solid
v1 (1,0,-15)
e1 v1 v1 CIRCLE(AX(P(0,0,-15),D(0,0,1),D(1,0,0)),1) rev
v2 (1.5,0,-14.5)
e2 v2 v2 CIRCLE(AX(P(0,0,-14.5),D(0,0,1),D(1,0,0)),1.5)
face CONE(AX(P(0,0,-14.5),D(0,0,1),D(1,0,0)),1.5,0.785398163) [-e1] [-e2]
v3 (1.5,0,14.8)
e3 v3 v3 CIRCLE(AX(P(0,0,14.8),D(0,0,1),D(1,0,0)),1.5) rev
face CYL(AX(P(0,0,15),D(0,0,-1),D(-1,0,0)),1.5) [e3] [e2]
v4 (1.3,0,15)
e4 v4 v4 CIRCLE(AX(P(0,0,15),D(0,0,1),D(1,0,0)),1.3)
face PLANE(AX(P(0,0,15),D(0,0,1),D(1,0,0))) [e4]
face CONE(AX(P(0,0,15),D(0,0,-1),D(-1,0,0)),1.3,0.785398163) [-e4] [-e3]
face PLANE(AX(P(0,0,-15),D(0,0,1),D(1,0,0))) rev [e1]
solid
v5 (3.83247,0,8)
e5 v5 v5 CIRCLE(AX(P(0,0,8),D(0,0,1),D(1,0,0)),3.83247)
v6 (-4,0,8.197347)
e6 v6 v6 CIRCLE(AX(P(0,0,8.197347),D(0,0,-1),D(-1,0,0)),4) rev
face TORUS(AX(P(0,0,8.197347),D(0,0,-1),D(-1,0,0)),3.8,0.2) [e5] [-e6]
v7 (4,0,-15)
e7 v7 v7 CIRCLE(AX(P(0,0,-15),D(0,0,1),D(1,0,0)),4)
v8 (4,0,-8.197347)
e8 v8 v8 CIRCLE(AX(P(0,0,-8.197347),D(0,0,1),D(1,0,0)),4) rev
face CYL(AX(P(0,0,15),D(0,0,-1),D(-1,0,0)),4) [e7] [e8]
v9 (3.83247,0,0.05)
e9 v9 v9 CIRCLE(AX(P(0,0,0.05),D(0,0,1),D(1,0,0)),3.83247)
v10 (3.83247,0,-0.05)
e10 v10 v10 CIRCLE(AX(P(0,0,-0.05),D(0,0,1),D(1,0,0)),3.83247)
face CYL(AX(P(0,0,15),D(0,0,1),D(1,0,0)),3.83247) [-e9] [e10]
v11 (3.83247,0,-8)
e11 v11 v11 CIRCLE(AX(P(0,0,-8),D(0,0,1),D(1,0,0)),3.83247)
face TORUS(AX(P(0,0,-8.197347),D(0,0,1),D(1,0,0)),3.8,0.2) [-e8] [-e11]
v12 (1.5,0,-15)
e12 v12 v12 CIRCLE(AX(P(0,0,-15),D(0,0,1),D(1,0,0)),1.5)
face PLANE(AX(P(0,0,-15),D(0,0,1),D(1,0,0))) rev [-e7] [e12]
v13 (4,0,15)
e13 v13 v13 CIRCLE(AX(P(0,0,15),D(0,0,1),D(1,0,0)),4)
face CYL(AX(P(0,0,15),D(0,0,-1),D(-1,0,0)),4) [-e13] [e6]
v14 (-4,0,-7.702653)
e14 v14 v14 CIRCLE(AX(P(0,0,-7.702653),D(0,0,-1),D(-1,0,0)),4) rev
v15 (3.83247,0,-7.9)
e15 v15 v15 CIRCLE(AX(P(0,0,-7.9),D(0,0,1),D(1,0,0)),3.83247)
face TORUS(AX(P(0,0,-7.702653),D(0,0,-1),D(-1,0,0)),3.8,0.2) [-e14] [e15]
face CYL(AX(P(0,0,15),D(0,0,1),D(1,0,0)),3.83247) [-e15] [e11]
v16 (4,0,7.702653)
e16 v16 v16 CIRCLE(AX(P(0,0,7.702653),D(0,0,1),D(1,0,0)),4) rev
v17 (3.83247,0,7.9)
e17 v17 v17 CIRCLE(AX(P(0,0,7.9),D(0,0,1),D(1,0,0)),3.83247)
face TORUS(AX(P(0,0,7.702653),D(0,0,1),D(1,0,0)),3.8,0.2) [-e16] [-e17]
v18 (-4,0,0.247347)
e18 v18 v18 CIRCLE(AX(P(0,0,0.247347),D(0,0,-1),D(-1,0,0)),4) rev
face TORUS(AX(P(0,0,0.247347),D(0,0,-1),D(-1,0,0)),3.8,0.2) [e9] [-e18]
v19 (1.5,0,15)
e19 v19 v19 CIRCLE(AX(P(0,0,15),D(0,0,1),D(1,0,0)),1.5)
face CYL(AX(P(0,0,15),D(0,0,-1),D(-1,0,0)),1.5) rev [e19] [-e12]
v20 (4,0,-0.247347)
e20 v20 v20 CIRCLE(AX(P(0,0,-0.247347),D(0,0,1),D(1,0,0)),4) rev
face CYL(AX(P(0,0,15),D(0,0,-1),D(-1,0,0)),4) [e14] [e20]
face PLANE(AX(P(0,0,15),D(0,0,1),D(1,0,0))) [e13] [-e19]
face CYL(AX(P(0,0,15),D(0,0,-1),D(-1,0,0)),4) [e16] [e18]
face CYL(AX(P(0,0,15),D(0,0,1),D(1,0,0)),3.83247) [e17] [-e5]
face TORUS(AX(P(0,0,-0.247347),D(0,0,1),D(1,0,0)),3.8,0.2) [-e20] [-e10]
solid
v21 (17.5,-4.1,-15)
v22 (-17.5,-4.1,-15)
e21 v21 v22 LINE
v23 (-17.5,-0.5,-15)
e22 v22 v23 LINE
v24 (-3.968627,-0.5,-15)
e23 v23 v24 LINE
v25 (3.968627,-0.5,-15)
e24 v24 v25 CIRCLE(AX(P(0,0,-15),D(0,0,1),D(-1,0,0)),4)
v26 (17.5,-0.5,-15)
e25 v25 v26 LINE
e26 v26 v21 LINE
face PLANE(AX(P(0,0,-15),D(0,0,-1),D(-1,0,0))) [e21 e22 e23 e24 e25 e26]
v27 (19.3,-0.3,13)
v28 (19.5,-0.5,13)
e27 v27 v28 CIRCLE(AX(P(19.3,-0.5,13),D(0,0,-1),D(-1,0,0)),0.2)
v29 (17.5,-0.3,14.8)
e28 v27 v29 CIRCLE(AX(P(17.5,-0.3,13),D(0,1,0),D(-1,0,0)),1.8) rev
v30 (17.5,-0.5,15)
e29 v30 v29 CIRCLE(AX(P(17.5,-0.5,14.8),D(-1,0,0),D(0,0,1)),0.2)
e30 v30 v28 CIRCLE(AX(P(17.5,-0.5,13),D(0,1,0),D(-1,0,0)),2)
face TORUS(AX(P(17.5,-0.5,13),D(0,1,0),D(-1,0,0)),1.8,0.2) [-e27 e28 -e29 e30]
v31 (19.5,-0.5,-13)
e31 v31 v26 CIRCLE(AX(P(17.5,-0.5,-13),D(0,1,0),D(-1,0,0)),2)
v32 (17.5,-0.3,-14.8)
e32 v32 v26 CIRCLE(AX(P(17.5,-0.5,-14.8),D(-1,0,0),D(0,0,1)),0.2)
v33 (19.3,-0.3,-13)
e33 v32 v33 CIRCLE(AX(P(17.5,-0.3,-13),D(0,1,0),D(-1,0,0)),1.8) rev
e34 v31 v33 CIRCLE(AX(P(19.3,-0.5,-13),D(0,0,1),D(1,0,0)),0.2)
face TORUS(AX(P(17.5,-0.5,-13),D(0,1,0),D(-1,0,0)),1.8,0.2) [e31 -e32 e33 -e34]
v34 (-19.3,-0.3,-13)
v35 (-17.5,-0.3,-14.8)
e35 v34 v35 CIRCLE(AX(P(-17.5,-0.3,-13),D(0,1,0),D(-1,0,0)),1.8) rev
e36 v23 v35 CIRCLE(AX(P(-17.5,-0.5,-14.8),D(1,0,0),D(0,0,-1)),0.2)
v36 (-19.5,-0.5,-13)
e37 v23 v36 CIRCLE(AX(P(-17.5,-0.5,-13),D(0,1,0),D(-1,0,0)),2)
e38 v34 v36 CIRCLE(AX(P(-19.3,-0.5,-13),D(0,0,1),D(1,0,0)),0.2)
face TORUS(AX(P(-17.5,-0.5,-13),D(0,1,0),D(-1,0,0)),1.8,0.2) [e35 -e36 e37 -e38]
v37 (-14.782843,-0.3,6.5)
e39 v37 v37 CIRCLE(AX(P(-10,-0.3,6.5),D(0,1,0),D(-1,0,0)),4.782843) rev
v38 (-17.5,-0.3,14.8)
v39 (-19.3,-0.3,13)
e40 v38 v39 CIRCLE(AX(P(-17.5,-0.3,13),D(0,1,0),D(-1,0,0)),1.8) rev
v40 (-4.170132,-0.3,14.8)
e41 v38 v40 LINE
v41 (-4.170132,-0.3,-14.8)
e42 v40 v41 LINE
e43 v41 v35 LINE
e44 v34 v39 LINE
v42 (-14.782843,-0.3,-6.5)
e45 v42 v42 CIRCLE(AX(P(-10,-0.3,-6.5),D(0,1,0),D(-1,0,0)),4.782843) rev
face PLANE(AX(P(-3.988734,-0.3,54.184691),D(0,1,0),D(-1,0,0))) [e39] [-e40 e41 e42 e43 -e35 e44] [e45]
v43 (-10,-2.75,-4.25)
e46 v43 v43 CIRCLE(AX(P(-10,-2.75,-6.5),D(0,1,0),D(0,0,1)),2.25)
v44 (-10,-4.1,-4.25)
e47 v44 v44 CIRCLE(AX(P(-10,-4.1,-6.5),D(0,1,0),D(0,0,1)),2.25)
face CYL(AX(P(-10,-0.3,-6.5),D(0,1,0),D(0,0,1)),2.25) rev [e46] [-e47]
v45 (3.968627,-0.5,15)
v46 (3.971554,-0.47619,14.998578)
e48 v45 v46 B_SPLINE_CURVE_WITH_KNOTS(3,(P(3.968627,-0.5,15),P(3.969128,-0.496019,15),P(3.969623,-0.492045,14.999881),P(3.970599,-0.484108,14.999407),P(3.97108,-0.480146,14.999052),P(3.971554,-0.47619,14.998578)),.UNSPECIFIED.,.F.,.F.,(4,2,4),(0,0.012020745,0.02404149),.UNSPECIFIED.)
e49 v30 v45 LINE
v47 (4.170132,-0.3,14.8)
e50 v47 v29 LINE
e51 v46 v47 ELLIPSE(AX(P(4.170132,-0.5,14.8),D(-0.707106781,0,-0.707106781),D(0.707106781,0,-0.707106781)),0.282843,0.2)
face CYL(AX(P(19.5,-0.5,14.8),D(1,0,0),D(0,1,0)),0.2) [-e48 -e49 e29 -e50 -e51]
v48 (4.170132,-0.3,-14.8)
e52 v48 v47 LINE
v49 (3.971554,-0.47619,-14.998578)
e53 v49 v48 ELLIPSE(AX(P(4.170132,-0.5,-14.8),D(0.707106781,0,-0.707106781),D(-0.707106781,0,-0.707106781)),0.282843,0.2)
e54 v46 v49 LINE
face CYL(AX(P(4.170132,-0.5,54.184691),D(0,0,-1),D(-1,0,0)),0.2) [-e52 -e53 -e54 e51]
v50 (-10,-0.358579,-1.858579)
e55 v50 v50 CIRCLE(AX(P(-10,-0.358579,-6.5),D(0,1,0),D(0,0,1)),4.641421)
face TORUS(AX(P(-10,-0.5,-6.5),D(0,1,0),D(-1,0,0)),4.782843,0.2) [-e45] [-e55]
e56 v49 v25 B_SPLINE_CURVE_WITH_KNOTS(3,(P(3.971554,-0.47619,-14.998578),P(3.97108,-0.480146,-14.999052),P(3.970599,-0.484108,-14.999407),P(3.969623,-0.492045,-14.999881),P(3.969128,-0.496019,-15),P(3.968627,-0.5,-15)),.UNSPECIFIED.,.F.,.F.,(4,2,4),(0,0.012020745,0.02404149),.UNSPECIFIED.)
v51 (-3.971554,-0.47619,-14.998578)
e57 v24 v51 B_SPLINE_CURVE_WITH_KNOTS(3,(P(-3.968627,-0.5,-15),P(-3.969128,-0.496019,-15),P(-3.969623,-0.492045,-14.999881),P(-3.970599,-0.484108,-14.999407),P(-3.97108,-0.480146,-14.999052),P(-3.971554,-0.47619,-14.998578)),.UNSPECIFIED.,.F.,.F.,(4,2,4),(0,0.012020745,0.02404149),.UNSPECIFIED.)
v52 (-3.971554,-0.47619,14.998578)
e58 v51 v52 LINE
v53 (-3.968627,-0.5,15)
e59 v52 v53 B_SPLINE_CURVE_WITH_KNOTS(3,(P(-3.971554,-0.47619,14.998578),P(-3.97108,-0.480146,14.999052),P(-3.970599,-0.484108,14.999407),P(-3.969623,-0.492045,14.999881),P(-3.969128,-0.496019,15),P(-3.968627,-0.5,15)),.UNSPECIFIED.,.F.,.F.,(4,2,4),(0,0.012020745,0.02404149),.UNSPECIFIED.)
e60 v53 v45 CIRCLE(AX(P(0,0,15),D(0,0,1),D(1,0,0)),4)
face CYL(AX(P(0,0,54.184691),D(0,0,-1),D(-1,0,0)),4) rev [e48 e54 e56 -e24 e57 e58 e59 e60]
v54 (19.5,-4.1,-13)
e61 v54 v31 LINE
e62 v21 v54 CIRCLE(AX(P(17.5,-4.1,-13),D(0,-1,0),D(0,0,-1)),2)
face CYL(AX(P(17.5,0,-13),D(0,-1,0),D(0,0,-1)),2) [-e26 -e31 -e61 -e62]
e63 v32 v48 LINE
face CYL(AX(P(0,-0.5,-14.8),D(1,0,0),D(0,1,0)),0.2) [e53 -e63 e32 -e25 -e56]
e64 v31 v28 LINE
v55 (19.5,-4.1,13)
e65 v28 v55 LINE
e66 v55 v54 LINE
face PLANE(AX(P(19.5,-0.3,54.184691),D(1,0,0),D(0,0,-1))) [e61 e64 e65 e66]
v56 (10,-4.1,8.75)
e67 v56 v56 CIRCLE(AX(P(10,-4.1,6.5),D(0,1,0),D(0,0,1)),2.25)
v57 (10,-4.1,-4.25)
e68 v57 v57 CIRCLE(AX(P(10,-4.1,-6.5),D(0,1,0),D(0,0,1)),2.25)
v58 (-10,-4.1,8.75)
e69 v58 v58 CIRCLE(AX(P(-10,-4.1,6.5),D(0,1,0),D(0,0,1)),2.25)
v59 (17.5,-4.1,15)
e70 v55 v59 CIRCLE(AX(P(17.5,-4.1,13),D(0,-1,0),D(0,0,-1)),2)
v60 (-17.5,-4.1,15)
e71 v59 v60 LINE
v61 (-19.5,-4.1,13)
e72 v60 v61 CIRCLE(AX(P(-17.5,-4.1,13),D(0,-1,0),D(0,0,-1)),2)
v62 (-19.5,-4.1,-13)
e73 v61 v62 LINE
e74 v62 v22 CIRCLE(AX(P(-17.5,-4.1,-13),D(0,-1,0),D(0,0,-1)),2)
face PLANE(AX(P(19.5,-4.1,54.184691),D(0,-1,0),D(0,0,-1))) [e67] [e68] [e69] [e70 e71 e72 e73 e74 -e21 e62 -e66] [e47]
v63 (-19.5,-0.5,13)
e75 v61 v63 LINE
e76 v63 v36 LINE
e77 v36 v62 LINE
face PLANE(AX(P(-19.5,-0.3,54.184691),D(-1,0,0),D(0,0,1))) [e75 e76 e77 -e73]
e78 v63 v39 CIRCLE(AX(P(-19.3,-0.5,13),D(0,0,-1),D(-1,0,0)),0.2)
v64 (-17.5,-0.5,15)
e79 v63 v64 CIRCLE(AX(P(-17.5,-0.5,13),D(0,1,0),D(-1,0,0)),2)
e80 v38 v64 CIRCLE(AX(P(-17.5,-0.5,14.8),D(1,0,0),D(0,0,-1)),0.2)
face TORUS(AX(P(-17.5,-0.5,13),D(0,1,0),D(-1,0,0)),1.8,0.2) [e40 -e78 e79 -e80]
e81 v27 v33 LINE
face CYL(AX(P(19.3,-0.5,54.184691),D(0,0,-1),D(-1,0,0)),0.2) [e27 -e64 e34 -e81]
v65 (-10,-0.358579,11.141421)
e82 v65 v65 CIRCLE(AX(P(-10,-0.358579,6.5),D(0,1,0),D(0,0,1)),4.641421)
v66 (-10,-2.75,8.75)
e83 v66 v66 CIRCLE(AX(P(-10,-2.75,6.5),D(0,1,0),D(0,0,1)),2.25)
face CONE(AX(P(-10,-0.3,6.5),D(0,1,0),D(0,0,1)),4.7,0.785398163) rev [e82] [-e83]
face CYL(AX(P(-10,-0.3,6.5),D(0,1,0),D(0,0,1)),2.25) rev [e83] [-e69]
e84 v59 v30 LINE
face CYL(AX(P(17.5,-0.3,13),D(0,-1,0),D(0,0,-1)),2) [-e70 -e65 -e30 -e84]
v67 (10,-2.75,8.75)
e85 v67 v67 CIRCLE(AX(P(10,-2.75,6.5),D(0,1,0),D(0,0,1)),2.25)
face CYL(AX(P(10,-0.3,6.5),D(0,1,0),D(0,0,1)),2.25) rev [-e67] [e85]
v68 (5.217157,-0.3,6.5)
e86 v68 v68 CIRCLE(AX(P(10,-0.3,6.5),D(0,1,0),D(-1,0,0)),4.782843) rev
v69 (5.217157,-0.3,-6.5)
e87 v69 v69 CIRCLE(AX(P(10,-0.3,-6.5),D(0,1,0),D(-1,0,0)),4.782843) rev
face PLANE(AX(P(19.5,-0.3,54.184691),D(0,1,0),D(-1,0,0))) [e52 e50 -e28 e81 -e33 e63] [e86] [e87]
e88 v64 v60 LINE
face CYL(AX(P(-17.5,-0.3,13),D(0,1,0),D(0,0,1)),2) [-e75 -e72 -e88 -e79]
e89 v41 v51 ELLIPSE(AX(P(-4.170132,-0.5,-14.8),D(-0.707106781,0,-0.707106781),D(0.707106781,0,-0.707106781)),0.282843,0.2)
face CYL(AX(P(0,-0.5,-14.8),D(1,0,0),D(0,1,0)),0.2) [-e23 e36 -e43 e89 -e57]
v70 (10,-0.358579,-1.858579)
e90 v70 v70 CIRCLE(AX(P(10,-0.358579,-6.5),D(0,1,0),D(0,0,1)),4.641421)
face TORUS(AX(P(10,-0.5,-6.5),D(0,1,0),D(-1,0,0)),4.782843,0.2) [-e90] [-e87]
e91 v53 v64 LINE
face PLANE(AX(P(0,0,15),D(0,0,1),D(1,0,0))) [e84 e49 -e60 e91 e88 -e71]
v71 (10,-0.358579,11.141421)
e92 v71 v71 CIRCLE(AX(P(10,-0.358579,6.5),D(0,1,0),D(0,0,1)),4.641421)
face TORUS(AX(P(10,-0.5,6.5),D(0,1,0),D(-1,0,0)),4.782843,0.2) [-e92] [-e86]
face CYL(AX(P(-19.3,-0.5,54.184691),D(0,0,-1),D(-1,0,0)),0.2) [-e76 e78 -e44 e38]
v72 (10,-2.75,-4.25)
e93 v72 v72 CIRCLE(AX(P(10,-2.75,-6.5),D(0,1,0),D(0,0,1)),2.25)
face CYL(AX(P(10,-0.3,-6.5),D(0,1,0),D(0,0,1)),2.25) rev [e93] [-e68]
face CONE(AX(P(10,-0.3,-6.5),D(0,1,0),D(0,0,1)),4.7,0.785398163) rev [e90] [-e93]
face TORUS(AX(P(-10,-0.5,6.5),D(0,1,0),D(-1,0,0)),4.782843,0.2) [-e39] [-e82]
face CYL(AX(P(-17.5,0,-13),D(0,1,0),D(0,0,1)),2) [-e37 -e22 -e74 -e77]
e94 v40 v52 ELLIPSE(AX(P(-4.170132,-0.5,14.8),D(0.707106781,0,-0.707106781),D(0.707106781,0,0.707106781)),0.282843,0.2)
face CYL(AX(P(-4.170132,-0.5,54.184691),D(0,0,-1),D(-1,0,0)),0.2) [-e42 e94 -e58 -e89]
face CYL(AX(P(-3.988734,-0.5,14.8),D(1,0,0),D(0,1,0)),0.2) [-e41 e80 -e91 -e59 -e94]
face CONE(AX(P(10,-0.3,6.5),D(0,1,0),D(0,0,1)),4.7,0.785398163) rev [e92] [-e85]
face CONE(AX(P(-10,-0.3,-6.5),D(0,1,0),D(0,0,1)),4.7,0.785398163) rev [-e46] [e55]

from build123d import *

# Parameters (mm, degrees)
SKETCH_1_R                  = 4
SKETCH_1_R_2                = 1.5
EXTRUDE_1_DEPTH             = 15
SKETCH_2_R                  = 1.5
EXTRUDE_2_DEPTH             = 15
CHAMFER_1_SIZE              = 0.2
SKETCH_3_W                  = 1.062209714
SKETCH_3_H                  = 0.1
FILLET_1_R                  = 0.2
EXTRUDE_6_DEPTH             = 30
HOLE_WIZARD_M4_1_AT_2_COUNT = 2
HOLE_WIZARD_M4_1_AT_2_PITCH = 20
HOLE_WIZARD_M4_1_AT_3_COUNT = 2
HOLE_WIZARD_M4_1_AT_3_PITCH = 13
HOLE_WIZARD_M4_1_AT_4_COUNT = 2
HOLE_WIZARD_M4_1_AT_4_PITCH = 23.853720884
FILLET_2_R                  = 0.2
FILLET_3_R                  = 2
CHAMFER_2_SIZE              = 0.5


with BuildPart() as part:
    # 草图1 → 凸台-拉伸1 (new, symmetric)
    with BuildSketch(Plane.XY):
        Circle(SKETCH_1_R)
        Circle(SKETCH_1_R_2, mode=Mode.SUBTRACT)
    extrude(amount=EXTRUDE_1_DEPTH, both=True)

    # 草图3 → 切除-旋转1 (revolve, cut)
    with BuildSketch(Plane(origin=(0, 0, 0), x_dir=(1, 0, 0), z_dir=(0, 1, 0))):
        with Locations((4.363574537, 7.95)):
            Rectangle(SKETCH_3_W, SKETCH_3_H)
        with Locations((4.363574537, 0)):
            Rectangle(SKETCH_3_W, SKETCH_3_H)
        with Locations((4.363574537, -7.95)):
            Rectangle(SKETCH_3_W, SKETCH_3_H)
    revolve(axis=Axis((0, 0, 15), (0, 0, -1)), mode=Mode.SUBTRACT)

    # 圆角1
    # the kernel refuses this fillet: 0.2 mm, written as the material it takes off along each edge
    with BuildSketch(Plane(origin=(0, 0, -7.9), x_dir=(1, 0, 0), z_dir=(0, -1, 0))) as fillet_1_piece_1:
        with BuildLine():
            CenterArc((3.8, 0.1973467), FILLET_1_R, 279.343232253, 80.656767747)
            Line((4, 0.1973467), (4.004, 0.1973467))
            Line((4.004, 0.1973467), (4.004, 0))
            Line((4.004, 0), (4, -0.004))
            ThreePointArc((4, -0.004), (3.91623484, -0.004), (3.833119074, -0.003946934))
            Line((3.833119074, -0.003946934), (3.83246968, 0))
        make_face()
    revolve(axis=Axis((0, 0, -7.9), (0, 0, 1)), mode=Mode.SUBTRACT)
    with BuildSketch(Plane(origin=(0, 0, -8), x_dir=(1, 0, 0), z_dir=(0, -1, 0))) as fillet_1_piece_2:
        with BuildLine():
            CenterArc((3.8, -0.1973467), FILLET_1_R, 0, 80.656767747)
            Line((3.83246968, 0), (3.833119074, 0.003946934))
            ThreePointArc((3.833119074, 0.003946934), (3.91623484, 0.004), (4, 0.004))
            Line((4, 0.004), (4.004, 0))
            Line((4.004, 0), (4.004, -0.1973467))
            Line((4.004, -0.1973467), (4, -0.1973467))
        make_face()
    revolve(axis=Axis((0, 0, -8), (0, 0, 1)), mode=Mode.SUBTRACT)
    with BuildSketch(Plane(origin=(0, 0, 0.05), x_dir=(1, 0, 0), z_dir=(0, -1, 0))) as fillet_1_piece_3:
        with BuildLine():
            CenterArc((3.8, 0.1973467), FILLET_1_R, 279.343232253, 80.656767747)
            Line((4, 0.1973467), (4.004, 0.1973467))
            Line((4.004, 0.1973467), (4.004, 0))
            Line((4.004, 0), (4, -0.004))
            ThreePointArc((4, -0.004), (3.91623484, -0.004), (3.833119074, -0.003946934))
            Line((3.833119074, -0.003946934), (3.83246968, 0))
        make_face()
    revolve(axis=Axis((0, 0, 0.05), (0, 0, 1)), mode=Mode.SUBTRACT)
    with BuildSketch(Plane(origin=(0, 0, -0.05), x_dir=(1, 0, 0), z_dir=(0, -1, 0))) as fillet_1_piece_4:
        with BuildLine():
            CenterArc((3.8, -0.1973467), FILLET_1_R, 0, 80.656767747)
            Line((3.83246968, 0), (3.833119074, 0.003946934))
            ThreePointArc((3.833119074, 0.003946934), (3.91623484, 0.004), (4, 0.004))
            Line((4, 0.004), (4.004, 0))
            Line((4.004, 0), (4.004, -0.1973467))
            Line((4.004, -0.1973467), (4, -0.1973467))
        make_face()
    revolve(axis=Axis((0, 0, -0.05), (0, 0, 1)), mode=Mode.SUBTRACT)
    with BuildSketch(Plane(origin=(0, 0, 8), x_dir=(1, 0, 0), z_dir=(0, -1, 0))) as fillet_1_piece_5:
        with BuildLine():
            CenterArc((3.8, 0.1973467), FILLET_1_R, 279.343232253, 80.656767747)
            Line((3.83246968, 0), (3.833119074, -0.003946934))
            ThreePointArc((3.833119074, -0.003946934), (3.91623484, -0.004), (4, -0.004))
            Line((4, -0.004), (4.004, 0))
            Line((4.004, 0), (4.004, 0.1973467))
            Line((4.004, 0.1973467), (4, 0.1973467))
        make_face()
    revolve(axis=Axis((0, 0, 8), (0, 0, 1)), mode=Mode.SUBTRACT)
    with BuildSketch(Plane(origin=(0, 0, 7.9), x_dir=(1, 0, 0), z_dir=(0, -1, 0))) as fillet_1_piece_6:
        with BuildLine():
            CenterArc((3.8, -0.1973467), FILLET_1_R, 0, 80.656767747)
            Line((4, -0.1973467), (4.004, -0.1973467))
            Line((4.004, -0.1973467), (4.004, 0))
            Line((4.004, 0), (4, 0.004))
            ThreePointArc((4, 0.004), (3.91623484, 0.004), (3.833119074, 0.003946934))
            Line((3.833119074, 0.003946934), (3.83246968, 0))
        make_face()
    revolve(axis=Axis((0, 0, 7.9), (0, 0, 1)), mode=Mode.SUBTRACT)


with BuildPart() as body_2:
    # 草图2 → 凸台-拉伸2 (new, symmetric)
    with BuildSketch(Plane.XY):
        Circle(SKETCH_2_R)
    extrude(amount=EXTRUDE_2_DEPTH, both=True)

    # 倒角1
    chamfer_1_edges = [body_2.edges().sort_by_distance(p)[0] for p in [
        (-1.5, 0, 15),
    ]]
    chamfer(chamfer_1_edges, length=CHAMFER_1_SIZE)

    # 倒角2
    chamfer_2_edges = [body_2.edges().sort_by_distance(p)[0] for p in [
        (-1.5, 0, -15),
    ]]
    chamfer(chamfer_2_edges, length=CHAMFER_2_SIZE)


with BuildPart() as body_3:
    # 草图5 → 凸台-拉伸6 (new body)
    with BuildSketch(Plane(origin=(0, 0, -15), x_dir=(-1, 0, 0), z_dir=(0, 0, -1))):
        with BuildLine():
            Line((3.988734135, -0.3), (19.5, -0.3))
            Line((19.5, -0.3), (19.5, -4.1))
            Line((19.5, -4.1), (-19.5, -4.1))
            Line((-19.5, -4.1), (-19.5, -0.3))
            Line((-19.5, -0.3), (-3.988734135, -0.3))
            ThreePointArc((-3.988734135, -0.3), (0, -4), (3.988734135, -0.3))
        make_face()
    extrude(amount=-EXTRUDE_6_DEPTH)

    # 草图6 → M4 平头机械螺钉的锥形沉头孔1 (revolve, cut)
    with BuildSketch(Plane(origin=(-10, -0.3, -6.5), x_dir=(0, 0, 1), z_dir=(1, 0, 0))):
        Polygon((0, 0), (0, 3.8), (2.25, 3.8), (2.25, 2.45), (4.7, 0), align=None)
    hole_wizard_m4_1 = revolve(axis=Axis((-10, 6.05, -6.5), (0, -1, 0)), mode=Mode.SUBTRACT)

    # M4 平头机械螺钉的锥形沉头孔1 at 2: M4 平头机械螺钉的锥形沉头孔1 ×2
    with Locations(*[(i * HOLE_WIZARD_M4_1_AT_2_PITCH, 0, 0) for i in range(1, HOLE_WIZARD_M4_1_AT_2_COUNT)]):
        add(hole_wizard_m4_1, mode=Mode.SUBTRACT)

    # M4 平头机械螺钉的锥形沉头孔1 at 3: M4 平头机械螺钉的锥形沉头孔1 ×2
    with Locations(*[(0, 0, i * HOLE_WIZARD_M4_1_AT_3_PITCH) for i in range(1, HOLE_WIZARD_M4_1_AT_3_COUNT)]):
        add(hole_wizard_m4_1, mode=Mode.SUBTRACT)

    # M4 平头机械螺钉的锥形沉头孔1 at 4: M4 平头机械螺钉的锥形沉头孔1 ×2
    with Locations(*[Vector(0.8384436163006371, 0, 0.5449883505954142) * (i * HOLE_WIZARD_M4_1_AT_4_PITCH) for i in range(1, HOLE_WIZARD_M4_1_AT_4_COUNT)]):
        add(hole_wizard_m4_1, mode=Mode.SUBTRACT)

    # 圆角2
    fillet_2_edges = [body_3.edges().sort_by_distance(p)[0] for p in [
        (-11.744367068, -0.3, -15),
        (10, -0.3, 1.8),
        (11.744367068, -0.3, -15),
        (-10, -0.3, 1.8),
        (-19.5, -0.3, 0),
        (-11.744367068, -0.3, 15),
        (10, -0.3, -11.2),
        (-3.988734135, -0.3, 0),
        (3.988734135, -0.3, 0),
        (11.744367068, -0.3, 15),
        (19.5, -0.3, 0),
        (-10, -0.3, -11.2),
    ]]
    fillet(fillet_2_edges, radius=FILLET_2_R)

    # 圆角3
    # the kernel refuses this fillet: 2 mm, written as the material it takes off along each edge
    with BuildSketch(Plane(origin=(17.5, -0.3, 13), x_dir=(0, 0, 1), z_dir=(-1, 0, 0))) as fillet_3_piece_1:
        with BuildLine():
            CenterArc((1.8, -0.2), 0.2, 0, 90)
            Line((2, -0.2), (2, 0))
            Line((2, 0), (1.8, 0))
        make_face()
    revolve(axis=Axis((17.5, -0.3, 13), (0, 1, 0)), revolution_arc=90, mode=Mode.SUBTRACT)
    with BuildSketch(Plane(origin=(17.5, -0.3, -13), x_dir=(1, 0, 0), z_dir=(0, 0, 1))) as fillet_3_piece_2:
        with BuildLine():
            CenterArc((1.8, -0.2), 0.2, 0, 90)
            Line((2, -0.2), (2, 0))
            Line((2, 0), (1.8, 0))
        make_face()
    revolve(axis=Axis((17.5, -0.3, -13), (0, 1, 0)), revolution_arc=90, mode=Mode.SUBTRACT)
    with BuildSketch(Plane(origin=(-17.5, -0.3, 13), x_dir=(-1, 0, 0), z_dir=(0, 0, -1))) as fillet_3_piece_3:
        with BuildLine():
            CenterArc((1.8, -0.2), 0.2, 0, 90)
            Line((2, -0.2), (2, 0))
            Line((2, 0), (1.8, 0))
        make_face()
    revolve(axis=Axis((-17.5, -0.3, 13), (0, 1, 0)), revolution_arc=90, mode=Mode.SUBTRACT)
    with BuildSketch(Plane(origin=(-17.5, -0.3, -13), x_dir=(0, 0, -1), z_dir=(1, 0, 0))) as fillet_3_piece_4:
        with BuildLine():
            CenterArc((1.8, -0.2), 0.2, 0, 90)
            Line((2, -0.2), (2, 0))
            Line((2, 0), (1.8, 0))
        make_face()
    revolve(axis=Axis((-17.5, -0.3, -13), (0, 1, 0)), revolution_arc=90, mode=Mode.SUBTRACT)
    with BuildSketch(Plane(origin=(-19.5, -0.3, -15), x_dir=(1, 0, 0), z_dir=(0, -1, 0)), Plane(origin=(-19.5, -0.3, 15), x_dir=(0, 0, -1), z_dir=(0, -1, 0)), Plane(origin=(19.5, -9.1, -15), x_dir=(-1, 0, 0), z_dir=(0, 1, 0))) as fillet_3_piece_5:
        with BuildLine():
            CenterArc((FILLET_3_R, FILLET_3_R), FILLET_3_R, 180, 90)
            Line((0, FILLET_3_R), (0, 0))
            Line((0, 0), (FILLET_3_R, 0))
        make_face()
    extrude(amount=8.8, mode=Mode.SUBTRACT)
    with BuildSketch(Plane(origin=(19.5, -9.1, 15), x_dir=(-1, 0, 0), z_dir=(0, 1, 0))) as fillet_3_piece_6:
        with BuildLine():
            CenterArc((FILLET_3_R, -FILLET_3_R), FILLET_3_R, 90, 90)
            Line((0, -FILLET_3_R), (0, 0))
            Line((0, 0), (FILLET_3_R, 0))
        make_face()
    extrude(amount=8.8, mode=Mode.SUBTRACT)


solid = Compound([part.part, body_2.part, body_3.part])
